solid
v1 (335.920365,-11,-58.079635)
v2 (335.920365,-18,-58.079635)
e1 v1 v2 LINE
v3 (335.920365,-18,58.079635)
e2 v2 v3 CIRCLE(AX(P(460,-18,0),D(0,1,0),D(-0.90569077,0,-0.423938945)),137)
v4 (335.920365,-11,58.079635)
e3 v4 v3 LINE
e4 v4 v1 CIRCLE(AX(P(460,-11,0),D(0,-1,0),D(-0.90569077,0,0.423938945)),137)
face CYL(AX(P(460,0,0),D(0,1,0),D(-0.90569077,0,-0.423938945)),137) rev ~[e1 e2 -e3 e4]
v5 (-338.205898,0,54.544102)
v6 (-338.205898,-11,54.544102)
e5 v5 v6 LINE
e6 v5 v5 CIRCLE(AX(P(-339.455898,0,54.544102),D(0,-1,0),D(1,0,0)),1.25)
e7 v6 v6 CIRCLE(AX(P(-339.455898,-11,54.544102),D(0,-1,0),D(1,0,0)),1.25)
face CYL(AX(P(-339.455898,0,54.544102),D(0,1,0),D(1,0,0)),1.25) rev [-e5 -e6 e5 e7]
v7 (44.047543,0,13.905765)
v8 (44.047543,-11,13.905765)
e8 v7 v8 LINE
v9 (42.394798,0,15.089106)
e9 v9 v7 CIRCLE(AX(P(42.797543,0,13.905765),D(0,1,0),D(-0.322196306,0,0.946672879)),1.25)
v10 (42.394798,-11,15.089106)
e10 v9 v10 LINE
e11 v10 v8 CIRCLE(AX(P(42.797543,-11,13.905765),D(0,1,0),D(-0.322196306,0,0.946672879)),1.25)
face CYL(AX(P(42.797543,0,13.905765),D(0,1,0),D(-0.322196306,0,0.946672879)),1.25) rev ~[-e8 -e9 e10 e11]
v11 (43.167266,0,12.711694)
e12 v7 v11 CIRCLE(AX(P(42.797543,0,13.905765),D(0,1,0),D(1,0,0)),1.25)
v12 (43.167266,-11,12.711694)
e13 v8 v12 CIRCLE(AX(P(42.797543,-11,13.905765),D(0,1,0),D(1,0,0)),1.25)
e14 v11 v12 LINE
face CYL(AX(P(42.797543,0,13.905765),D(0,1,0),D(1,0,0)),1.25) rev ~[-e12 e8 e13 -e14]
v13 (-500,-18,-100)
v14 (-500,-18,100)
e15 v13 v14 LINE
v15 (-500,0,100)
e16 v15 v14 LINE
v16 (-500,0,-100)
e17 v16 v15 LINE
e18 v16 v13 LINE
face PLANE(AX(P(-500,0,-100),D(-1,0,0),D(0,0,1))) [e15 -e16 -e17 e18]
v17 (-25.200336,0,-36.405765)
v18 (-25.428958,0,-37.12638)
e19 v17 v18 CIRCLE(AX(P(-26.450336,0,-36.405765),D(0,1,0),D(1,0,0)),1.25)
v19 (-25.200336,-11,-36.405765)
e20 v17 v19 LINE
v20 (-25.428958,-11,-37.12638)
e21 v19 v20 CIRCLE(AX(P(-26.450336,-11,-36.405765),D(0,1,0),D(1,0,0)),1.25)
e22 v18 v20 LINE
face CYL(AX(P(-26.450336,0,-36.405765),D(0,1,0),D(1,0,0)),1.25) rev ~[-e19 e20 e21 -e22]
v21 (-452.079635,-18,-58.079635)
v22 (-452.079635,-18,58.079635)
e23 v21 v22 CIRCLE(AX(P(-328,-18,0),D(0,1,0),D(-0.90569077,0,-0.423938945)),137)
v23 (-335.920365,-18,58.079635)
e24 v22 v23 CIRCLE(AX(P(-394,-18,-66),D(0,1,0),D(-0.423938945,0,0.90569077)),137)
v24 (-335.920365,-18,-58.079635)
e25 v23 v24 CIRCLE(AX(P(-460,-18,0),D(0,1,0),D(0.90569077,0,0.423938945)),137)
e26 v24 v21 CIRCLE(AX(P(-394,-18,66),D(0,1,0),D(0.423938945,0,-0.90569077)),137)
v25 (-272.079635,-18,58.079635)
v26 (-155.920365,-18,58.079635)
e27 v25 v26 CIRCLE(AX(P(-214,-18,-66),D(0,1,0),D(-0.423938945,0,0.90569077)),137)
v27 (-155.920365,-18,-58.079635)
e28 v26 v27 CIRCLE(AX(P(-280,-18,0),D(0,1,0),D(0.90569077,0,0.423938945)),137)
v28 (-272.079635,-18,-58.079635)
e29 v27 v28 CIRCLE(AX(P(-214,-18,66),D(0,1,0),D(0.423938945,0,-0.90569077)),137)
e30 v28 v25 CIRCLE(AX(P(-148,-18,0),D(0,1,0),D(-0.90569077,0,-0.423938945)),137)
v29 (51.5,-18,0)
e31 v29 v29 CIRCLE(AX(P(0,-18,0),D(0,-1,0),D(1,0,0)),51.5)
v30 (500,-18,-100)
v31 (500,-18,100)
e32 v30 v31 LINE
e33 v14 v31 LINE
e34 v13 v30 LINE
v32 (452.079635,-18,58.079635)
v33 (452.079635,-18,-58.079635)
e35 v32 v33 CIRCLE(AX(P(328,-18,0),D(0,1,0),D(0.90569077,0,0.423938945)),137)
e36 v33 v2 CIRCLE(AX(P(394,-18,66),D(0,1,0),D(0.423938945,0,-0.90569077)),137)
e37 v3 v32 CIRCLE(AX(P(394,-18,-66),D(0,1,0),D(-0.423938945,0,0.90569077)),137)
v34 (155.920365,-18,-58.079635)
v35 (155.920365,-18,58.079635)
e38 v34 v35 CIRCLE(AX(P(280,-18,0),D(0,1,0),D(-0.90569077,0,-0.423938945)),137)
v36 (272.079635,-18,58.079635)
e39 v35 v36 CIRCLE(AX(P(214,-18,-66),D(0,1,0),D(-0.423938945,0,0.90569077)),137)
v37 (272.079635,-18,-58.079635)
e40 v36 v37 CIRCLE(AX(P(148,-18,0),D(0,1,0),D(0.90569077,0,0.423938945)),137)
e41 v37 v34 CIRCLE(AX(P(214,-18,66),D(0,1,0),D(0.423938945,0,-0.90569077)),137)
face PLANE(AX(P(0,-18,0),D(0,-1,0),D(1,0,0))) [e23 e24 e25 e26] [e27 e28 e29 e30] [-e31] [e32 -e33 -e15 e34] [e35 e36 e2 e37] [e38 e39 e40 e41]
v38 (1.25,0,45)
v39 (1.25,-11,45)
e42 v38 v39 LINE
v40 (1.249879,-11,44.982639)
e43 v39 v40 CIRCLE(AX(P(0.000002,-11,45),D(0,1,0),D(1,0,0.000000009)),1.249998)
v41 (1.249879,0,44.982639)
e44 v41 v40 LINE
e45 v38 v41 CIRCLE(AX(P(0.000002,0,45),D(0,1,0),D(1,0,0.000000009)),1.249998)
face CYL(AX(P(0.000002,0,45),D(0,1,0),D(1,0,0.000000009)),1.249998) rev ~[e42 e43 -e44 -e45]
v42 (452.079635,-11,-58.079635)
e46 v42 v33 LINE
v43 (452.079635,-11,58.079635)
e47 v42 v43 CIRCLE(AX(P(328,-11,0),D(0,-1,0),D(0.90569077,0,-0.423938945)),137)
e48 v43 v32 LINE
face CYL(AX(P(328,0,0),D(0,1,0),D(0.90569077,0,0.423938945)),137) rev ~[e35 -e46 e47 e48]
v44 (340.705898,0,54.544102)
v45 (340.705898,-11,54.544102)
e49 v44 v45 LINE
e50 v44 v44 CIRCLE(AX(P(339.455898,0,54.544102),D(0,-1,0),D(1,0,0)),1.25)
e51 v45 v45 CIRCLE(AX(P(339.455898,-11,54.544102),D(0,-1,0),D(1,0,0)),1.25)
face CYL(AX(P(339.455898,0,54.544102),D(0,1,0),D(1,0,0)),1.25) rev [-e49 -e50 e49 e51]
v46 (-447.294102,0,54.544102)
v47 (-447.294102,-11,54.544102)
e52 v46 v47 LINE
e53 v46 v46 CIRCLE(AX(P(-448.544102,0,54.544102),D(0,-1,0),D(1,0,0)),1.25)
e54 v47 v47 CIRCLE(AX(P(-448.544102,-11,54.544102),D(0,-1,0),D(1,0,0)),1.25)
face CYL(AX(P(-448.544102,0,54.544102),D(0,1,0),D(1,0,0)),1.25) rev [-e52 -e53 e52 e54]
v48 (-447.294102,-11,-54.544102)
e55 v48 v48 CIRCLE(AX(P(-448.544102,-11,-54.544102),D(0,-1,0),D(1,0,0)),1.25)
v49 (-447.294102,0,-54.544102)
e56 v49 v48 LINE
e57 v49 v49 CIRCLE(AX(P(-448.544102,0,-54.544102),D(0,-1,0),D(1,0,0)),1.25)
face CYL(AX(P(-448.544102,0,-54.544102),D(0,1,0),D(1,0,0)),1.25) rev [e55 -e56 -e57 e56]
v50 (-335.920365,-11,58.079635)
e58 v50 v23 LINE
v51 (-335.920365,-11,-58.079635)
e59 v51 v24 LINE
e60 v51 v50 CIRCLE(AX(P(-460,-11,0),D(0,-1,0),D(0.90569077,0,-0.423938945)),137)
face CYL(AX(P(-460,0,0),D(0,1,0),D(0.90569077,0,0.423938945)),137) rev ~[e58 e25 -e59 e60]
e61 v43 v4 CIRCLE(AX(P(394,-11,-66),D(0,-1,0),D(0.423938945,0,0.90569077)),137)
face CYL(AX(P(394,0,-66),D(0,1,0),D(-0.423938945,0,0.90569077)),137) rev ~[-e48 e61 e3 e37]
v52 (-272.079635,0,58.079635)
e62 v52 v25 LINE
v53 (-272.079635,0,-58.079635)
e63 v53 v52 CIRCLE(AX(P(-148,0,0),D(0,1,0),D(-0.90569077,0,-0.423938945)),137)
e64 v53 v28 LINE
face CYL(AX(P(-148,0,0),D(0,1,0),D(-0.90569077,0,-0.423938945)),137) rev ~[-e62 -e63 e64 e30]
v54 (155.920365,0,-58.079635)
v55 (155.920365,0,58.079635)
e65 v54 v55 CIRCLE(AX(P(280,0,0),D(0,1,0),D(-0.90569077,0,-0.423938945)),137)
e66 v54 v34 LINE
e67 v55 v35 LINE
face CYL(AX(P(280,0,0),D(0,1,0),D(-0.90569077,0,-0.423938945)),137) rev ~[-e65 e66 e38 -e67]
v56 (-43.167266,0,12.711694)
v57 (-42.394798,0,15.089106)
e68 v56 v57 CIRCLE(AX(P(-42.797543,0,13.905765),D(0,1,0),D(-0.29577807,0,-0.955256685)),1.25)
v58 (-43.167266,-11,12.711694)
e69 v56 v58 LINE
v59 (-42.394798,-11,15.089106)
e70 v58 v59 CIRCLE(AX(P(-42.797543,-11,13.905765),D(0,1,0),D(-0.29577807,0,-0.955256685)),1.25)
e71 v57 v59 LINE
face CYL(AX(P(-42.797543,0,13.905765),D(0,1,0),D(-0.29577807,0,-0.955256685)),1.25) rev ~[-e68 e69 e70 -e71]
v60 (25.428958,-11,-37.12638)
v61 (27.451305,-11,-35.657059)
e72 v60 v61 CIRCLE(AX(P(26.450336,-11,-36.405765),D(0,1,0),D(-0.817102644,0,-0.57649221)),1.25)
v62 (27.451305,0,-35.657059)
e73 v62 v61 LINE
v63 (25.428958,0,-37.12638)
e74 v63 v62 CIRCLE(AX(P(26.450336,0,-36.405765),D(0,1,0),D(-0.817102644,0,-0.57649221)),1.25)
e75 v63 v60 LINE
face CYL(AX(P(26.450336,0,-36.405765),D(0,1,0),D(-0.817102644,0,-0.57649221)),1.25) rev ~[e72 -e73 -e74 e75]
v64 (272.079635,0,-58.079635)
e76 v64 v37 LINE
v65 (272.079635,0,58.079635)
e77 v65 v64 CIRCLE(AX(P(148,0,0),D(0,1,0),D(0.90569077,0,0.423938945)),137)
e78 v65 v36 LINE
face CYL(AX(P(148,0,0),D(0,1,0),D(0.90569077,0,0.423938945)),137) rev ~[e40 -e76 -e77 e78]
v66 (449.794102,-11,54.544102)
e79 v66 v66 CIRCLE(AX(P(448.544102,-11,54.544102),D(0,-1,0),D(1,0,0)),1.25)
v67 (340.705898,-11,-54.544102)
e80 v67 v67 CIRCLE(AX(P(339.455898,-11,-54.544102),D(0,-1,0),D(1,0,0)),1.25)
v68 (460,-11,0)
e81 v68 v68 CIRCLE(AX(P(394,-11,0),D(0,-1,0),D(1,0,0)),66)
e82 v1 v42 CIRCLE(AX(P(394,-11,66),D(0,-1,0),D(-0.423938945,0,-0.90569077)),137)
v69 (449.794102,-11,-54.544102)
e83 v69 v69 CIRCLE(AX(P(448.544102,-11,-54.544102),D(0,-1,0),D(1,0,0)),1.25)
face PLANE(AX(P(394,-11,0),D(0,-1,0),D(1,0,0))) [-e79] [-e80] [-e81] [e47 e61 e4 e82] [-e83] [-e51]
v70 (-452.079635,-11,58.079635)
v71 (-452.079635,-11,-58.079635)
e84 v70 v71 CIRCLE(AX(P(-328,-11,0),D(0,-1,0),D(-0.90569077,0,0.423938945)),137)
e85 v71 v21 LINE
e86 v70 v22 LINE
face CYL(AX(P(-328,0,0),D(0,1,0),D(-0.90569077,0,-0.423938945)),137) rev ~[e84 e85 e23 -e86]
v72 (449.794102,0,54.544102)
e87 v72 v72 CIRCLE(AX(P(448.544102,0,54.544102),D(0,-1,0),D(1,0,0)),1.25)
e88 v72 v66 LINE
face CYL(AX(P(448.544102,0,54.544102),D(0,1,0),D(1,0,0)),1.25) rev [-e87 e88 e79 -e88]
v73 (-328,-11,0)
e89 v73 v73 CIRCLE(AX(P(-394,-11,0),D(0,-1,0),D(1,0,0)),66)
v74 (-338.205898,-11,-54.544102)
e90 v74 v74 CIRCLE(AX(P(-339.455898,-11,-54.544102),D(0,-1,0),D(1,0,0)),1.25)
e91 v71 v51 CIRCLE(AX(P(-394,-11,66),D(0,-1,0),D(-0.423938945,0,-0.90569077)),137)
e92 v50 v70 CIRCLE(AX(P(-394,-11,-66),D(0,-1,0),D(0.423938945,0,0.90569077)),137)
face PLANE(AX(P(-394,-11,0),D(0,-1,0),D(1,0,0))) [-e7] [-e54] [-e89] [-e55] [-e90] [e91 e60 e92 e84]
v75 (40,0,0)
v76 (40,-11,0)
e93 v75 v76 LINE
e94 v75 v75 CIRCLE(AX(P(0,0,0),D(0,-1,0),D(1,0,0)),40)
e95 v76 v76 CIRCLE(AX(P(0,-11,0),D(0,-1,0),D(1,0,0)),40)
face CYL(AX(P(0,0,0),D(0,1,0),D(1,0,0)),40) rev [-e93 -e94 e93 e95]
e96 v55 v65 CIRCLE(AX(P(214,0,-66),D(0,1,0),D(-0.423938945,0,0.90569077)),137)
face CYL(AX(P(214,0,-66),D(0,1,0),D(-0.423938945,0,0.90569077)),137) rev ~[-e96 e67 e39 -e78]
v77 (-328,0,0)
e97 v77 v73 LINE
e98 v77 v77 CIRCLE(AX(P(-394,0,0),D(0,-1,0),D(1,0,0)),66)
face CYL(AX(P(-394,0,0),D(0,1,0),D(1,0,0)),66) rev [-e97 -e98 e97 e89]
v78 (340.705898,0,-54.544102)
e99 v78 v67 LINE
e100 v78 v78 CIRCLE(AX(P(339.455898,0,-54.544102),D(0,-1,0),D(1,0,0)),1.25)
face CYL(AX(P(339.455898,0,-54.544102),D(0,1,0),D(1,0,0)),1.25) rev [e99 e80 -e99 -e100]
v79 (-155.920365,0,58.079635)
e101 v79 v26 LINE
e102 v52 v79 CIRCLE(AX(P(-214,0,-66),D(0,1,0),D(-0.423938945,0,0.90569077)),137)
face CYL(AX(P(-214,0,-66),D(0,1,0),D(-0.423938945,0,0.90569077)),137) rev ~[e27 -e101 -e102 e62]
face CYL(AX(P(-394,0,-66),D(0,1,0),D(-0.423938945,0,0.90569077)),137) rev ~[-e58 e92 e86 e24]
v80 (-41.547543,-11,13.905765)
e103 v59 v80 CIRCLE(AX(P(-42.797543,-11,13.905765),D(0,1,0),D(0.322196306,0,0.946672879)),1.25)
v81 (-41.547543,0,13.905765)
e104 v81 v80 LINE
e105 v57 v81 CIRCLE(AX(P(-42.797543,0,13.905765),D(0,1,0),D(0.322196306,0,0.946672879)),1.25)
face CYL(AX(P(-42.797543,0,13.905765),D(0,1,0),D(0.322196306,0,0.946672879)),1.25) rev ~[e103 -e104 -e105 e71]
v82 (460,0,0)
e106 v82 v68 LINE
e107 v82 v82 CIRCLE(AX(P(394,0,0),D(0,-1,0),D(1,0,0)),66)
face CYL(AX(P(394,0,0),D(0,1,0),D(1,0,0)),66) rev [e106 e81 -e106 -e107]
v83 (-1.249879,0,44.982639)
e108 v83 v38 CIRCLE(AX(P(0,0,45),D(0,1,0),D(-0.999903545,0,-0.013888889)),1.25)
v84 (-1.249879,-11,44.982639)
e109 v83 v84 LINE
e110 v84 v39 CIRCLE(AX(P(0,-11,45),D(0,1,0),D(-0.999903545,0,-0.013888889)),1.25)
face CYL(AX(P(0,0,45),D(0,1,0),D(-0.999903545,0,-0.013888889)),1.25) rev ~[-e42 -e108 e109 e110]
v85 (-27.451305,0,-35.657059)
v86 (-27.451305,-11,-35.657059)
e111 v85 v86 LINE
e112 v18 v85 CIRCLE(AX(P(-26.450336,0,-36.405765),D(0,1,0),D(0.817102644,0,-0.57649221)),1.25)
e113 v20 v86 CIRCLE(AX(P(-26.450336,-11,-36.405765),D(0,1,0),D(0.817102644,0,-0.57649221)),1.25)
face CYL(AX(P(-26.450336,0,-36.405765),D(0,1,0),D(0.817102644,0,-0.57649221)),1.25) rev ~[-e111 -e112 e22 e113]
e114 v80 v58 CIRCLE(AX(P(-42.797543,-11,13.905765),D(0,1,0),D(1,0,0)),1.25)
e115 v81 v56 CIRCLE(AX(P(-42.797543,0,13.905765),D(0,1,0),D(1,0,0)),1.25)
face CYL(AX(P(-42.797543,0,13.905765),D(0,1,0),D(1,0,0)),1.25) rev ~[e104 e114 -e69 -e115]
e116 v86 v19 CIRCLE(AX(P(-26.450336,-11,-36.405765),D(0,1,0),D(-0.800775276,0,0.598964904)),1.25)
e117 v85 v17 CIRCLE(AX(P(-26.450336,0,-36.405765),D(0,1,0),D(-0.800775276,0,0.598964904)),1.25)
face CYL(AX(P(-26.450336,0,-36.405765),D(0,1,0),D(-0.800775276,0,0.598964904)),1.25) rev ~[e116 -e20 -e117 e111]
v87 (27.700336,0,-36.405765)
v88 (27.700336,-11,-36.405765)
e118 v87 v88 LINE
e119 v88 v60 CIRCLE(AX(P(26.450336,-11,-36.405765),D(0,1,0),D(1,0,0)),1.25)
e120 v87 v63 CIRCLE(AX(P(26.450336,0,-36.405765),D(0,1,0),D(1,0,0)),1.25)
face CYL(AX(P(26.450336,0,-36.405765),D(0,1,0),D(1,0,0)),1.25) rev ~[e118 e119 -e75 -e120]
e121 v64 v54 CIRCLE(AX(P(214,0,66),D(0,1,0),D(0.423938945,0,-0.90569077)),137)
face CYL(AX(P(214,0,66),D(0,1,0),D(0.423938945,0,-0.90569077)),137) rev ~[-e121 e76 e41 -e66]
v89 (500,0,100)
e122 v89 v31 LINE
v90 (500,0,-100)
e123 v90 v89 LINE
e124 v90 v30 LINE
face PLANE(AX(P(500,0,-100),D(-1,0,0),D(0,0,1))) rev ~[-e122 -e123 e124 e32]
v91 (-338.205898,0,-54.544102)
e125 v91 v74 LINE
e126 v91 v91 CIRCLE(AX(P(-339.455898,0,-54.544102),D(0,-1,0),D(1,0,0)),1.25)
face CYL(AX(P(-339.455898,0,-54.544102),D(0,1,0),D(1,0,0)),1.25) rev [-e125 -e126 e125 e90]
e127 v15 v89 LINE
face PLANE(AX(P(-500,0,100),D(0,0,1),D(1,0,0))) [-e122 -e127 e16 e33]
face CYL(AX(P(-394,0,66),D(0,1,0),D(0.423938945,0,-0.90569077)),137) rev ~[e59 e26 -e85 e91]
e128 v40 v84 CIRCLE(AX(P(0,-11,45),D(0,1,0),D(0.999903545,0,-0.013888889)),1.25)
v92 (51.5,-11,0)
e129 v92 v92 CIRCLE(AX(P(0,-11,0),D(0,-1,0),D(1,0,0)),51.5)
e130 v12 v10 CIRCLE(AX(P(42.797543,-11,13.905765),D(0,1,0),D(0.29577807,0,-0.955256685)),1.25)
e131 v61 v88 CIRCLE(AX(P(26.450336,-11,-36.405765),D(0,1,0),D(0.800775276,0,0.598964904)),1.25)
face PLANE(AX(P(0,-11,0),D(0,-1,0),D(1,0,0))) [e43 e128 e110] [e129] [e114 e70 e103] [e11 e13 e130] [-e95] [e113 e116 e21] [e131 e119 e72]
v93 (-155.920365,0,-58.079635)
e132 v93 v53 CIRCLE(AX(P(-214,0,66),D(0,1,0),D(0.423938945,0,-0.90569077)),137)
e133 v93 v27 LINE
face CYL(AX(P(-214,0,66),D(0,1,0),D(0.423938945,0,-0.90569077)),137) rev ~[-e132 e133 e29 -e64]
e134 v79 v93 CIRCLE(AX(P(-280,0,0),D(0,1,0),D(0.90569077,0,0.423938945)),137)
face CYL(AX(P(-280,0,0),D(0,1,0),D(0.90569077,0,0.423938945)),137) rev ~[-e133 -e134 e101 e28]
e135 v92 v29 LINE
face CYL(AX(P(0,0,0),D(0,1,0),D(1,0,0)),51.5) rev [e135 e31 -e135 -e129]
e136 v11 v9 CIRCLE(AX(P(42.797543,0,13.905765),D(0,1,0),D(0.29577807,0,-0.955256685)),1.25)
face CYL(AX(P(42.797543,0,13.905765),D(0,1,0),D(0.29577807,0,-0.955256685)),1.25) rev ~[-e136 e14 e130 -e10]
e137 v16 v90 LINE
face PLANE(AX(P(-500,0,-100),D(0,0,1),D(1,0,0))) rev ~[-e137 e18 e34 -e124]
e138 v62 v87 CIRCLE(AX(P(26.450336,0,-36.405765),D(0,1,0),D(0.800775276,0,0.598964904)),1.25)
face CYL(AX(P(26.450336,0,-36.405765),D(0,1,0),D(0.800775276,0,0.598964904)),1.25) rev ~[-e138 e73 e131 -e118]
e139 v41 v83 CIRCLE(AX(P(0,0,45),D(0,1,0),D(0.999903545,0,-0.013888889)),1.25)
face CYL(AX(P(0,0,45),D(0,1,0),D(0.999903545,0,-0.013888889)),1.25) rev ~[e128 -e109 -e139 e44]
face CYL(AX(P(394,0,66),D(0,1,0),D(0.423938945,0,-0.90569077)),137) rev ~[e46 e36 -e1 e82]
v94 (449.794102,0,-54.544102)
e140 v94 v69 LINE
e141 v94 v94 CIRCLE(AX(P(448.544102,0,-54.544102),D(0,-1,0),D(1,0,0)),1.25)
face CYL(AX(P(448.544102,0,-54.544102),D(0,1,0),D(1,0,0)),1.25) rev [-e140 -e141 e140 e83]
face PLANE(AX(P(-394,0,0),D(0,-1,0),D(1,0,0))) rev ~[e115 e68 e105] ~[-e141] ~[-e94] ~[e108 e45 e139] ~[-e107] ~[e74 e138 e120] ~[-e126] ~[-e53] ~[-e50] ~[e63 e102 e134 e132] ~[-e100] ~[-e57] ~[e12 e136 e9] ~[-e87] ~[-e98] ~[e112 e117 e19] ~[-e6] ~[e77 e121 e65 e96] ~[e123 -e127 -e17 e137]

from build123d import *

# Parameters (mm, degrees)
F0_W     = 1000
F0_H     = 200
F0_R     = 51.5
F1_DEPTH = 18
F0_R_2   = 1.25
F0_R_3   = 66
F0_R_4   = 40
F2_DEPTH = 11


# Not quite as in the source:
# - a feature names something its author has since deleted; it is built from what else it names


with BuildPart() as f1:
    # F0 (on Front) → F1 (new body)
    with BuildSketch(Plane.XZ):
        Rectangle(F0_W, F0_H)
        with BuildLine():
            ThreePointArc((-452.0796354846, 58.0796354846), (-394, 71), (-335.9203645154, 58.0796354846))
            ThreePointArc((-335.9203645154, 58.0796354846), (-323, 0), (-335.9203645154, -58.0796354846))
            ThreePointArc((-335.9203645154, -58.0796354846), (-394, -71), (-452.0796354846, -58.0796354846))
            ThreePointArc((-452.0796354846, -58.0796354846), (-465, 0), (-452.0796354846, 58.0796354846))
        make_face(mode=Mode.SUBTRACT)
        with BuildLine():
            ThreePointArc((-272.0796354846, 58.0796354846), (-214, 71), (-155.9203645154, 58.0796354846))
            ThreePointArc((-155.9203645154, 58.0796354846), (-143, 0), (-155.9203645154, -58.0796354846))
            ThreePointArc((-155.9203645154, -58.0796354846), (-214, -71), (-272.0796354846, -58.0796354846))
            ThreePointArc((-272.0796354846, -58.0796354846), (-285, 0), (-272.0796354846, 58.0796354846))
        make_face(mode=Mode.SUBTRACT)
        Circle(F0_R, mode=Mode.SUBTRACT)
        with BuildLine():
            ThreePointArc((155.9203645154, -58.0796354846), (143, 0), (155.9203645154, 58.0796354846))
            ThreePointArc((155.9203645154, 58.0796354846), (214, 71), (272.0796354846, 58.0796354846))
            ThreePointArc((272.0796354846, 58.0796354846), (285, 0), (272.0796354846, -58.0796354846))
            ThreePointArc((272.0796354846, -58.0796354846), (214, -71), (155.9203645154, -58.0796354846))
        make_face(mode=Mode.SUBTRACT)
        with BuildLine():
            ThreePointArc((335.9203645154, 58.0796354846), (394, 71), (452.0796354846, 58.0796354846))
            ThreePointArc((452.0796354846, 58.0796354846), (465, 0), (452.0796354846, -58.0796354846))
            ThreePointArc((452.0796354846, -58.0796354846), (394, -71), (335.9203645154, -58.0796354846))
            ThreePointArc((335.9203645154, -58.0796354846), (323, 0), (335.9203645154, 58.0796354846))
        make_face(mode=Mode.SUBTRACT)
    extrude(amount=F1_DEPTH)

    # F0 (on Front) → F2 (join)
    with BuildSketch(Plane.XZ):
        with BuildLine():
            ThreePointArc((-335.9203645154, -58.0796354846), (-323, 0), (-335.9203645154, 58.0796354846))
            ThreePointArc((-335.9203645154, 58.0796354846), (-394, 71), (-452.0796354846, 58.0796354846))
            ThreePointArc((-452.0796354846, 58.0796354846), (-465, 0), (-452.0796354846, -58.0796354846))
            ThreePointArc((-452.0796354846, -58.0796354846), (-394, -71), (-335.9203645154, -58.0796354846))
        make_face()
        with Locations((-448.5441015786, -54.5441015786)):
            Circle(F0_R_2, mode=Mode.SUBTRACT)
        with Locations((-339.4558984214, -54.5441015786)):
            Circle(F0_R_2, mode=Mode.SUBTRACT)
        with Locations((-394, 0)):
            Circle(F0_R_3, mode=Mode.SUBTRACT)
        with Locations((-448.5441015786, 54.5441015786)):
            Circle(F0_R_2, mode=Mode.SUBTRACT)
        with Locations((-339.4558984214, 54.5441015786)):
            Circle(F0_R_2, mode=Mode.SUBTRACT)
        with BuildLine():
            ThreePointArc((452.0796354846, -58.0796354846), (465, 0), (452.0796354846, 58.0796354846))
            ThreePointArc((452.0796354846, 58.0796354846), (394, 71), (335.9203645154, 58.0796354846))
            ThreePointArc((335.9203645154, 58.0796354846), (323, 0), (335.9203645154, -58.0796354846))
            ThreePointArc((335.9203645154, -58.0796354846), (394, -71), (452.0796354846, -58.0796354846))
        make_face()
        with Locations((339.4558984214, -54.5441015786)):
            Circle(F0_R_2, mode=Mode.SUBTRACT)
        with Locations((448.5441015786, -54.5441015786)):
            Circle(F0_R_2, mode=Mode.SUBTRACT)
        with Locations((394, 0)):
            Circle(F0_R_3, mode=Mode.SUBTRACT)
        with Locations((339.4558984214, 54.5441015786)):
            Circle(F0_R_2, mode=Mode.SUBTRACT)
        with Locations((448.5441015786, 54.5441015786)):
            Circle(F0_R_2, mode=Mode.SUBTRACT)
        Circle(F0_R)
        with BuildLine():
            ThreePointArc((43.1672658205, 12.7116938911), (44.5394598189, 6.4215667122), (45, 0))
            ThreePointArc((45, 0), (40.3751702485, -19.8707228708), (27.4513054486, -35.6570586163))
            ThreePointArc((27.4513054486, -35.6570586163), (27.6364458273, -36.0112469205), (27.7003363532, -36.4057647469))
            ThreePointArc((27.7003363532, -36.4057647469), (26.8283423835, -37.5972392288), (25.4289580476, -37.1263800096))
            ThreePointArc((25.4289580476, -37.1263800096), (0, -45), (-25.4289580476, -37.1263800096))
            ThreePointArc((-25.4289580476, -37.1263800096), (-27.1850679185, -37.4170359898), (-27.4513054486, -35.6570586163))
            ThreePointArc((-27.4513054486, -35.6570586163), (-42.7975432333, -13.9057647469), (-43.1672658205, 12.7116938911))
            ThreePointArc((-43.1672658205, 12.7116938911), (-43.9863638787, 14.2920359898), (-42.3947978504, 15.0891058459))
            ThreePointArc((-42.3947978504, 15.0891058459), (-26.4503363532, 36.4057647469), (-1.2498794309, 44.9826388889))
            ThreePointArc((-1.2498794309, 44.9826388889), (-0.0086807649, 46.2499698574), (1.25, 45))
            ThreePointArc((1.25, 45), (1.2499698574, 44.9913192351), (1.2498794309, 44.9826388889))
            ThreePointArc((1.2498794309, 44.9826388889), (26.4503363532, 36.4057647469), (42.3947978504, 15.0891058459))
            ThreePointArc((42.3947978504, 15.0891058459), (43.5252341949, 14.9221140295), (44.0475432333, 13.9057647469))
            ThreePointArc((44.0475432333, 13.9057647469), (43.8036876648, 13.1640280126), (43.1672658205, 12.7116938911))
        make_face(mode=Mode.SUBTRACT)
        with BuildLine():
            ThreePointArc((27.4513054486, -35.6570586163), (40.3751702485, -19.8707228708), (45, 0))
            ThreePointArc((45, 0), (44.5394598189, 6.4215667122), (43.1672658205, 12.7116938911))
            ThreePointArc((43.1672658205, 12.7116938911), (41.6087225879, 13.5194935039), (42.3947978504, 15.0891058459))
            ThreePointArc((42.3947978504, 15.0891058459), (26.4503363532, 36.4057647469), (1.2498794309, 44.9826388889))
            ThreePointArc((1.2498794309, 44.9826388889), (0, 43.75), (-1.2498794309, 44.9826388889))
            ThreePointArc((-1.2498794309, 44.9826388889), (-26.4503363532, 36.4057647469), (-42.3947978504, 15.0891058459))
            ThreePointArc((-42.3947978504, 15.0891058459), (-41.7811939506, 14.6334557085), (-41.5475432333, 13.9057647469))
            ThreePointArc((-41.5475432333, 13.9057647469), (-42.055806499, 12.8996203154), (-43.1672658205, 12.7116938911))
            ThreePointArc((-43.1672658205, 12.7116938911), (-42.7975432333, -13.9057647469), (-27.4513054486, -35.6570586163))
            ThreePointArc((-27.4513054486, -35.6570586163), (-26.0558185268, -35.2196552727), (-25.2003363532, -36.4057647469))
            ThreePointArc((-25.2003363532, -36.4057647469), (-25.2588618713, -36.7837707772), (-25.4289580476, -37.1263800096))
            ThreePointArc((-25.4289580476, -37.1263800096), (0, -45), (25.4289580476, -37.1263800096))
            ThreePointArc((25.4289580476, -37.1263800096), (25.7156047878, -35.3944935039), (27.4513054486, -35.6570586163))
        make_face()
        Circle(F0_R_4, mode=Mode.SUBTRACT)
    extrude(amount=F2_DEPTH)


solid = f1.part
